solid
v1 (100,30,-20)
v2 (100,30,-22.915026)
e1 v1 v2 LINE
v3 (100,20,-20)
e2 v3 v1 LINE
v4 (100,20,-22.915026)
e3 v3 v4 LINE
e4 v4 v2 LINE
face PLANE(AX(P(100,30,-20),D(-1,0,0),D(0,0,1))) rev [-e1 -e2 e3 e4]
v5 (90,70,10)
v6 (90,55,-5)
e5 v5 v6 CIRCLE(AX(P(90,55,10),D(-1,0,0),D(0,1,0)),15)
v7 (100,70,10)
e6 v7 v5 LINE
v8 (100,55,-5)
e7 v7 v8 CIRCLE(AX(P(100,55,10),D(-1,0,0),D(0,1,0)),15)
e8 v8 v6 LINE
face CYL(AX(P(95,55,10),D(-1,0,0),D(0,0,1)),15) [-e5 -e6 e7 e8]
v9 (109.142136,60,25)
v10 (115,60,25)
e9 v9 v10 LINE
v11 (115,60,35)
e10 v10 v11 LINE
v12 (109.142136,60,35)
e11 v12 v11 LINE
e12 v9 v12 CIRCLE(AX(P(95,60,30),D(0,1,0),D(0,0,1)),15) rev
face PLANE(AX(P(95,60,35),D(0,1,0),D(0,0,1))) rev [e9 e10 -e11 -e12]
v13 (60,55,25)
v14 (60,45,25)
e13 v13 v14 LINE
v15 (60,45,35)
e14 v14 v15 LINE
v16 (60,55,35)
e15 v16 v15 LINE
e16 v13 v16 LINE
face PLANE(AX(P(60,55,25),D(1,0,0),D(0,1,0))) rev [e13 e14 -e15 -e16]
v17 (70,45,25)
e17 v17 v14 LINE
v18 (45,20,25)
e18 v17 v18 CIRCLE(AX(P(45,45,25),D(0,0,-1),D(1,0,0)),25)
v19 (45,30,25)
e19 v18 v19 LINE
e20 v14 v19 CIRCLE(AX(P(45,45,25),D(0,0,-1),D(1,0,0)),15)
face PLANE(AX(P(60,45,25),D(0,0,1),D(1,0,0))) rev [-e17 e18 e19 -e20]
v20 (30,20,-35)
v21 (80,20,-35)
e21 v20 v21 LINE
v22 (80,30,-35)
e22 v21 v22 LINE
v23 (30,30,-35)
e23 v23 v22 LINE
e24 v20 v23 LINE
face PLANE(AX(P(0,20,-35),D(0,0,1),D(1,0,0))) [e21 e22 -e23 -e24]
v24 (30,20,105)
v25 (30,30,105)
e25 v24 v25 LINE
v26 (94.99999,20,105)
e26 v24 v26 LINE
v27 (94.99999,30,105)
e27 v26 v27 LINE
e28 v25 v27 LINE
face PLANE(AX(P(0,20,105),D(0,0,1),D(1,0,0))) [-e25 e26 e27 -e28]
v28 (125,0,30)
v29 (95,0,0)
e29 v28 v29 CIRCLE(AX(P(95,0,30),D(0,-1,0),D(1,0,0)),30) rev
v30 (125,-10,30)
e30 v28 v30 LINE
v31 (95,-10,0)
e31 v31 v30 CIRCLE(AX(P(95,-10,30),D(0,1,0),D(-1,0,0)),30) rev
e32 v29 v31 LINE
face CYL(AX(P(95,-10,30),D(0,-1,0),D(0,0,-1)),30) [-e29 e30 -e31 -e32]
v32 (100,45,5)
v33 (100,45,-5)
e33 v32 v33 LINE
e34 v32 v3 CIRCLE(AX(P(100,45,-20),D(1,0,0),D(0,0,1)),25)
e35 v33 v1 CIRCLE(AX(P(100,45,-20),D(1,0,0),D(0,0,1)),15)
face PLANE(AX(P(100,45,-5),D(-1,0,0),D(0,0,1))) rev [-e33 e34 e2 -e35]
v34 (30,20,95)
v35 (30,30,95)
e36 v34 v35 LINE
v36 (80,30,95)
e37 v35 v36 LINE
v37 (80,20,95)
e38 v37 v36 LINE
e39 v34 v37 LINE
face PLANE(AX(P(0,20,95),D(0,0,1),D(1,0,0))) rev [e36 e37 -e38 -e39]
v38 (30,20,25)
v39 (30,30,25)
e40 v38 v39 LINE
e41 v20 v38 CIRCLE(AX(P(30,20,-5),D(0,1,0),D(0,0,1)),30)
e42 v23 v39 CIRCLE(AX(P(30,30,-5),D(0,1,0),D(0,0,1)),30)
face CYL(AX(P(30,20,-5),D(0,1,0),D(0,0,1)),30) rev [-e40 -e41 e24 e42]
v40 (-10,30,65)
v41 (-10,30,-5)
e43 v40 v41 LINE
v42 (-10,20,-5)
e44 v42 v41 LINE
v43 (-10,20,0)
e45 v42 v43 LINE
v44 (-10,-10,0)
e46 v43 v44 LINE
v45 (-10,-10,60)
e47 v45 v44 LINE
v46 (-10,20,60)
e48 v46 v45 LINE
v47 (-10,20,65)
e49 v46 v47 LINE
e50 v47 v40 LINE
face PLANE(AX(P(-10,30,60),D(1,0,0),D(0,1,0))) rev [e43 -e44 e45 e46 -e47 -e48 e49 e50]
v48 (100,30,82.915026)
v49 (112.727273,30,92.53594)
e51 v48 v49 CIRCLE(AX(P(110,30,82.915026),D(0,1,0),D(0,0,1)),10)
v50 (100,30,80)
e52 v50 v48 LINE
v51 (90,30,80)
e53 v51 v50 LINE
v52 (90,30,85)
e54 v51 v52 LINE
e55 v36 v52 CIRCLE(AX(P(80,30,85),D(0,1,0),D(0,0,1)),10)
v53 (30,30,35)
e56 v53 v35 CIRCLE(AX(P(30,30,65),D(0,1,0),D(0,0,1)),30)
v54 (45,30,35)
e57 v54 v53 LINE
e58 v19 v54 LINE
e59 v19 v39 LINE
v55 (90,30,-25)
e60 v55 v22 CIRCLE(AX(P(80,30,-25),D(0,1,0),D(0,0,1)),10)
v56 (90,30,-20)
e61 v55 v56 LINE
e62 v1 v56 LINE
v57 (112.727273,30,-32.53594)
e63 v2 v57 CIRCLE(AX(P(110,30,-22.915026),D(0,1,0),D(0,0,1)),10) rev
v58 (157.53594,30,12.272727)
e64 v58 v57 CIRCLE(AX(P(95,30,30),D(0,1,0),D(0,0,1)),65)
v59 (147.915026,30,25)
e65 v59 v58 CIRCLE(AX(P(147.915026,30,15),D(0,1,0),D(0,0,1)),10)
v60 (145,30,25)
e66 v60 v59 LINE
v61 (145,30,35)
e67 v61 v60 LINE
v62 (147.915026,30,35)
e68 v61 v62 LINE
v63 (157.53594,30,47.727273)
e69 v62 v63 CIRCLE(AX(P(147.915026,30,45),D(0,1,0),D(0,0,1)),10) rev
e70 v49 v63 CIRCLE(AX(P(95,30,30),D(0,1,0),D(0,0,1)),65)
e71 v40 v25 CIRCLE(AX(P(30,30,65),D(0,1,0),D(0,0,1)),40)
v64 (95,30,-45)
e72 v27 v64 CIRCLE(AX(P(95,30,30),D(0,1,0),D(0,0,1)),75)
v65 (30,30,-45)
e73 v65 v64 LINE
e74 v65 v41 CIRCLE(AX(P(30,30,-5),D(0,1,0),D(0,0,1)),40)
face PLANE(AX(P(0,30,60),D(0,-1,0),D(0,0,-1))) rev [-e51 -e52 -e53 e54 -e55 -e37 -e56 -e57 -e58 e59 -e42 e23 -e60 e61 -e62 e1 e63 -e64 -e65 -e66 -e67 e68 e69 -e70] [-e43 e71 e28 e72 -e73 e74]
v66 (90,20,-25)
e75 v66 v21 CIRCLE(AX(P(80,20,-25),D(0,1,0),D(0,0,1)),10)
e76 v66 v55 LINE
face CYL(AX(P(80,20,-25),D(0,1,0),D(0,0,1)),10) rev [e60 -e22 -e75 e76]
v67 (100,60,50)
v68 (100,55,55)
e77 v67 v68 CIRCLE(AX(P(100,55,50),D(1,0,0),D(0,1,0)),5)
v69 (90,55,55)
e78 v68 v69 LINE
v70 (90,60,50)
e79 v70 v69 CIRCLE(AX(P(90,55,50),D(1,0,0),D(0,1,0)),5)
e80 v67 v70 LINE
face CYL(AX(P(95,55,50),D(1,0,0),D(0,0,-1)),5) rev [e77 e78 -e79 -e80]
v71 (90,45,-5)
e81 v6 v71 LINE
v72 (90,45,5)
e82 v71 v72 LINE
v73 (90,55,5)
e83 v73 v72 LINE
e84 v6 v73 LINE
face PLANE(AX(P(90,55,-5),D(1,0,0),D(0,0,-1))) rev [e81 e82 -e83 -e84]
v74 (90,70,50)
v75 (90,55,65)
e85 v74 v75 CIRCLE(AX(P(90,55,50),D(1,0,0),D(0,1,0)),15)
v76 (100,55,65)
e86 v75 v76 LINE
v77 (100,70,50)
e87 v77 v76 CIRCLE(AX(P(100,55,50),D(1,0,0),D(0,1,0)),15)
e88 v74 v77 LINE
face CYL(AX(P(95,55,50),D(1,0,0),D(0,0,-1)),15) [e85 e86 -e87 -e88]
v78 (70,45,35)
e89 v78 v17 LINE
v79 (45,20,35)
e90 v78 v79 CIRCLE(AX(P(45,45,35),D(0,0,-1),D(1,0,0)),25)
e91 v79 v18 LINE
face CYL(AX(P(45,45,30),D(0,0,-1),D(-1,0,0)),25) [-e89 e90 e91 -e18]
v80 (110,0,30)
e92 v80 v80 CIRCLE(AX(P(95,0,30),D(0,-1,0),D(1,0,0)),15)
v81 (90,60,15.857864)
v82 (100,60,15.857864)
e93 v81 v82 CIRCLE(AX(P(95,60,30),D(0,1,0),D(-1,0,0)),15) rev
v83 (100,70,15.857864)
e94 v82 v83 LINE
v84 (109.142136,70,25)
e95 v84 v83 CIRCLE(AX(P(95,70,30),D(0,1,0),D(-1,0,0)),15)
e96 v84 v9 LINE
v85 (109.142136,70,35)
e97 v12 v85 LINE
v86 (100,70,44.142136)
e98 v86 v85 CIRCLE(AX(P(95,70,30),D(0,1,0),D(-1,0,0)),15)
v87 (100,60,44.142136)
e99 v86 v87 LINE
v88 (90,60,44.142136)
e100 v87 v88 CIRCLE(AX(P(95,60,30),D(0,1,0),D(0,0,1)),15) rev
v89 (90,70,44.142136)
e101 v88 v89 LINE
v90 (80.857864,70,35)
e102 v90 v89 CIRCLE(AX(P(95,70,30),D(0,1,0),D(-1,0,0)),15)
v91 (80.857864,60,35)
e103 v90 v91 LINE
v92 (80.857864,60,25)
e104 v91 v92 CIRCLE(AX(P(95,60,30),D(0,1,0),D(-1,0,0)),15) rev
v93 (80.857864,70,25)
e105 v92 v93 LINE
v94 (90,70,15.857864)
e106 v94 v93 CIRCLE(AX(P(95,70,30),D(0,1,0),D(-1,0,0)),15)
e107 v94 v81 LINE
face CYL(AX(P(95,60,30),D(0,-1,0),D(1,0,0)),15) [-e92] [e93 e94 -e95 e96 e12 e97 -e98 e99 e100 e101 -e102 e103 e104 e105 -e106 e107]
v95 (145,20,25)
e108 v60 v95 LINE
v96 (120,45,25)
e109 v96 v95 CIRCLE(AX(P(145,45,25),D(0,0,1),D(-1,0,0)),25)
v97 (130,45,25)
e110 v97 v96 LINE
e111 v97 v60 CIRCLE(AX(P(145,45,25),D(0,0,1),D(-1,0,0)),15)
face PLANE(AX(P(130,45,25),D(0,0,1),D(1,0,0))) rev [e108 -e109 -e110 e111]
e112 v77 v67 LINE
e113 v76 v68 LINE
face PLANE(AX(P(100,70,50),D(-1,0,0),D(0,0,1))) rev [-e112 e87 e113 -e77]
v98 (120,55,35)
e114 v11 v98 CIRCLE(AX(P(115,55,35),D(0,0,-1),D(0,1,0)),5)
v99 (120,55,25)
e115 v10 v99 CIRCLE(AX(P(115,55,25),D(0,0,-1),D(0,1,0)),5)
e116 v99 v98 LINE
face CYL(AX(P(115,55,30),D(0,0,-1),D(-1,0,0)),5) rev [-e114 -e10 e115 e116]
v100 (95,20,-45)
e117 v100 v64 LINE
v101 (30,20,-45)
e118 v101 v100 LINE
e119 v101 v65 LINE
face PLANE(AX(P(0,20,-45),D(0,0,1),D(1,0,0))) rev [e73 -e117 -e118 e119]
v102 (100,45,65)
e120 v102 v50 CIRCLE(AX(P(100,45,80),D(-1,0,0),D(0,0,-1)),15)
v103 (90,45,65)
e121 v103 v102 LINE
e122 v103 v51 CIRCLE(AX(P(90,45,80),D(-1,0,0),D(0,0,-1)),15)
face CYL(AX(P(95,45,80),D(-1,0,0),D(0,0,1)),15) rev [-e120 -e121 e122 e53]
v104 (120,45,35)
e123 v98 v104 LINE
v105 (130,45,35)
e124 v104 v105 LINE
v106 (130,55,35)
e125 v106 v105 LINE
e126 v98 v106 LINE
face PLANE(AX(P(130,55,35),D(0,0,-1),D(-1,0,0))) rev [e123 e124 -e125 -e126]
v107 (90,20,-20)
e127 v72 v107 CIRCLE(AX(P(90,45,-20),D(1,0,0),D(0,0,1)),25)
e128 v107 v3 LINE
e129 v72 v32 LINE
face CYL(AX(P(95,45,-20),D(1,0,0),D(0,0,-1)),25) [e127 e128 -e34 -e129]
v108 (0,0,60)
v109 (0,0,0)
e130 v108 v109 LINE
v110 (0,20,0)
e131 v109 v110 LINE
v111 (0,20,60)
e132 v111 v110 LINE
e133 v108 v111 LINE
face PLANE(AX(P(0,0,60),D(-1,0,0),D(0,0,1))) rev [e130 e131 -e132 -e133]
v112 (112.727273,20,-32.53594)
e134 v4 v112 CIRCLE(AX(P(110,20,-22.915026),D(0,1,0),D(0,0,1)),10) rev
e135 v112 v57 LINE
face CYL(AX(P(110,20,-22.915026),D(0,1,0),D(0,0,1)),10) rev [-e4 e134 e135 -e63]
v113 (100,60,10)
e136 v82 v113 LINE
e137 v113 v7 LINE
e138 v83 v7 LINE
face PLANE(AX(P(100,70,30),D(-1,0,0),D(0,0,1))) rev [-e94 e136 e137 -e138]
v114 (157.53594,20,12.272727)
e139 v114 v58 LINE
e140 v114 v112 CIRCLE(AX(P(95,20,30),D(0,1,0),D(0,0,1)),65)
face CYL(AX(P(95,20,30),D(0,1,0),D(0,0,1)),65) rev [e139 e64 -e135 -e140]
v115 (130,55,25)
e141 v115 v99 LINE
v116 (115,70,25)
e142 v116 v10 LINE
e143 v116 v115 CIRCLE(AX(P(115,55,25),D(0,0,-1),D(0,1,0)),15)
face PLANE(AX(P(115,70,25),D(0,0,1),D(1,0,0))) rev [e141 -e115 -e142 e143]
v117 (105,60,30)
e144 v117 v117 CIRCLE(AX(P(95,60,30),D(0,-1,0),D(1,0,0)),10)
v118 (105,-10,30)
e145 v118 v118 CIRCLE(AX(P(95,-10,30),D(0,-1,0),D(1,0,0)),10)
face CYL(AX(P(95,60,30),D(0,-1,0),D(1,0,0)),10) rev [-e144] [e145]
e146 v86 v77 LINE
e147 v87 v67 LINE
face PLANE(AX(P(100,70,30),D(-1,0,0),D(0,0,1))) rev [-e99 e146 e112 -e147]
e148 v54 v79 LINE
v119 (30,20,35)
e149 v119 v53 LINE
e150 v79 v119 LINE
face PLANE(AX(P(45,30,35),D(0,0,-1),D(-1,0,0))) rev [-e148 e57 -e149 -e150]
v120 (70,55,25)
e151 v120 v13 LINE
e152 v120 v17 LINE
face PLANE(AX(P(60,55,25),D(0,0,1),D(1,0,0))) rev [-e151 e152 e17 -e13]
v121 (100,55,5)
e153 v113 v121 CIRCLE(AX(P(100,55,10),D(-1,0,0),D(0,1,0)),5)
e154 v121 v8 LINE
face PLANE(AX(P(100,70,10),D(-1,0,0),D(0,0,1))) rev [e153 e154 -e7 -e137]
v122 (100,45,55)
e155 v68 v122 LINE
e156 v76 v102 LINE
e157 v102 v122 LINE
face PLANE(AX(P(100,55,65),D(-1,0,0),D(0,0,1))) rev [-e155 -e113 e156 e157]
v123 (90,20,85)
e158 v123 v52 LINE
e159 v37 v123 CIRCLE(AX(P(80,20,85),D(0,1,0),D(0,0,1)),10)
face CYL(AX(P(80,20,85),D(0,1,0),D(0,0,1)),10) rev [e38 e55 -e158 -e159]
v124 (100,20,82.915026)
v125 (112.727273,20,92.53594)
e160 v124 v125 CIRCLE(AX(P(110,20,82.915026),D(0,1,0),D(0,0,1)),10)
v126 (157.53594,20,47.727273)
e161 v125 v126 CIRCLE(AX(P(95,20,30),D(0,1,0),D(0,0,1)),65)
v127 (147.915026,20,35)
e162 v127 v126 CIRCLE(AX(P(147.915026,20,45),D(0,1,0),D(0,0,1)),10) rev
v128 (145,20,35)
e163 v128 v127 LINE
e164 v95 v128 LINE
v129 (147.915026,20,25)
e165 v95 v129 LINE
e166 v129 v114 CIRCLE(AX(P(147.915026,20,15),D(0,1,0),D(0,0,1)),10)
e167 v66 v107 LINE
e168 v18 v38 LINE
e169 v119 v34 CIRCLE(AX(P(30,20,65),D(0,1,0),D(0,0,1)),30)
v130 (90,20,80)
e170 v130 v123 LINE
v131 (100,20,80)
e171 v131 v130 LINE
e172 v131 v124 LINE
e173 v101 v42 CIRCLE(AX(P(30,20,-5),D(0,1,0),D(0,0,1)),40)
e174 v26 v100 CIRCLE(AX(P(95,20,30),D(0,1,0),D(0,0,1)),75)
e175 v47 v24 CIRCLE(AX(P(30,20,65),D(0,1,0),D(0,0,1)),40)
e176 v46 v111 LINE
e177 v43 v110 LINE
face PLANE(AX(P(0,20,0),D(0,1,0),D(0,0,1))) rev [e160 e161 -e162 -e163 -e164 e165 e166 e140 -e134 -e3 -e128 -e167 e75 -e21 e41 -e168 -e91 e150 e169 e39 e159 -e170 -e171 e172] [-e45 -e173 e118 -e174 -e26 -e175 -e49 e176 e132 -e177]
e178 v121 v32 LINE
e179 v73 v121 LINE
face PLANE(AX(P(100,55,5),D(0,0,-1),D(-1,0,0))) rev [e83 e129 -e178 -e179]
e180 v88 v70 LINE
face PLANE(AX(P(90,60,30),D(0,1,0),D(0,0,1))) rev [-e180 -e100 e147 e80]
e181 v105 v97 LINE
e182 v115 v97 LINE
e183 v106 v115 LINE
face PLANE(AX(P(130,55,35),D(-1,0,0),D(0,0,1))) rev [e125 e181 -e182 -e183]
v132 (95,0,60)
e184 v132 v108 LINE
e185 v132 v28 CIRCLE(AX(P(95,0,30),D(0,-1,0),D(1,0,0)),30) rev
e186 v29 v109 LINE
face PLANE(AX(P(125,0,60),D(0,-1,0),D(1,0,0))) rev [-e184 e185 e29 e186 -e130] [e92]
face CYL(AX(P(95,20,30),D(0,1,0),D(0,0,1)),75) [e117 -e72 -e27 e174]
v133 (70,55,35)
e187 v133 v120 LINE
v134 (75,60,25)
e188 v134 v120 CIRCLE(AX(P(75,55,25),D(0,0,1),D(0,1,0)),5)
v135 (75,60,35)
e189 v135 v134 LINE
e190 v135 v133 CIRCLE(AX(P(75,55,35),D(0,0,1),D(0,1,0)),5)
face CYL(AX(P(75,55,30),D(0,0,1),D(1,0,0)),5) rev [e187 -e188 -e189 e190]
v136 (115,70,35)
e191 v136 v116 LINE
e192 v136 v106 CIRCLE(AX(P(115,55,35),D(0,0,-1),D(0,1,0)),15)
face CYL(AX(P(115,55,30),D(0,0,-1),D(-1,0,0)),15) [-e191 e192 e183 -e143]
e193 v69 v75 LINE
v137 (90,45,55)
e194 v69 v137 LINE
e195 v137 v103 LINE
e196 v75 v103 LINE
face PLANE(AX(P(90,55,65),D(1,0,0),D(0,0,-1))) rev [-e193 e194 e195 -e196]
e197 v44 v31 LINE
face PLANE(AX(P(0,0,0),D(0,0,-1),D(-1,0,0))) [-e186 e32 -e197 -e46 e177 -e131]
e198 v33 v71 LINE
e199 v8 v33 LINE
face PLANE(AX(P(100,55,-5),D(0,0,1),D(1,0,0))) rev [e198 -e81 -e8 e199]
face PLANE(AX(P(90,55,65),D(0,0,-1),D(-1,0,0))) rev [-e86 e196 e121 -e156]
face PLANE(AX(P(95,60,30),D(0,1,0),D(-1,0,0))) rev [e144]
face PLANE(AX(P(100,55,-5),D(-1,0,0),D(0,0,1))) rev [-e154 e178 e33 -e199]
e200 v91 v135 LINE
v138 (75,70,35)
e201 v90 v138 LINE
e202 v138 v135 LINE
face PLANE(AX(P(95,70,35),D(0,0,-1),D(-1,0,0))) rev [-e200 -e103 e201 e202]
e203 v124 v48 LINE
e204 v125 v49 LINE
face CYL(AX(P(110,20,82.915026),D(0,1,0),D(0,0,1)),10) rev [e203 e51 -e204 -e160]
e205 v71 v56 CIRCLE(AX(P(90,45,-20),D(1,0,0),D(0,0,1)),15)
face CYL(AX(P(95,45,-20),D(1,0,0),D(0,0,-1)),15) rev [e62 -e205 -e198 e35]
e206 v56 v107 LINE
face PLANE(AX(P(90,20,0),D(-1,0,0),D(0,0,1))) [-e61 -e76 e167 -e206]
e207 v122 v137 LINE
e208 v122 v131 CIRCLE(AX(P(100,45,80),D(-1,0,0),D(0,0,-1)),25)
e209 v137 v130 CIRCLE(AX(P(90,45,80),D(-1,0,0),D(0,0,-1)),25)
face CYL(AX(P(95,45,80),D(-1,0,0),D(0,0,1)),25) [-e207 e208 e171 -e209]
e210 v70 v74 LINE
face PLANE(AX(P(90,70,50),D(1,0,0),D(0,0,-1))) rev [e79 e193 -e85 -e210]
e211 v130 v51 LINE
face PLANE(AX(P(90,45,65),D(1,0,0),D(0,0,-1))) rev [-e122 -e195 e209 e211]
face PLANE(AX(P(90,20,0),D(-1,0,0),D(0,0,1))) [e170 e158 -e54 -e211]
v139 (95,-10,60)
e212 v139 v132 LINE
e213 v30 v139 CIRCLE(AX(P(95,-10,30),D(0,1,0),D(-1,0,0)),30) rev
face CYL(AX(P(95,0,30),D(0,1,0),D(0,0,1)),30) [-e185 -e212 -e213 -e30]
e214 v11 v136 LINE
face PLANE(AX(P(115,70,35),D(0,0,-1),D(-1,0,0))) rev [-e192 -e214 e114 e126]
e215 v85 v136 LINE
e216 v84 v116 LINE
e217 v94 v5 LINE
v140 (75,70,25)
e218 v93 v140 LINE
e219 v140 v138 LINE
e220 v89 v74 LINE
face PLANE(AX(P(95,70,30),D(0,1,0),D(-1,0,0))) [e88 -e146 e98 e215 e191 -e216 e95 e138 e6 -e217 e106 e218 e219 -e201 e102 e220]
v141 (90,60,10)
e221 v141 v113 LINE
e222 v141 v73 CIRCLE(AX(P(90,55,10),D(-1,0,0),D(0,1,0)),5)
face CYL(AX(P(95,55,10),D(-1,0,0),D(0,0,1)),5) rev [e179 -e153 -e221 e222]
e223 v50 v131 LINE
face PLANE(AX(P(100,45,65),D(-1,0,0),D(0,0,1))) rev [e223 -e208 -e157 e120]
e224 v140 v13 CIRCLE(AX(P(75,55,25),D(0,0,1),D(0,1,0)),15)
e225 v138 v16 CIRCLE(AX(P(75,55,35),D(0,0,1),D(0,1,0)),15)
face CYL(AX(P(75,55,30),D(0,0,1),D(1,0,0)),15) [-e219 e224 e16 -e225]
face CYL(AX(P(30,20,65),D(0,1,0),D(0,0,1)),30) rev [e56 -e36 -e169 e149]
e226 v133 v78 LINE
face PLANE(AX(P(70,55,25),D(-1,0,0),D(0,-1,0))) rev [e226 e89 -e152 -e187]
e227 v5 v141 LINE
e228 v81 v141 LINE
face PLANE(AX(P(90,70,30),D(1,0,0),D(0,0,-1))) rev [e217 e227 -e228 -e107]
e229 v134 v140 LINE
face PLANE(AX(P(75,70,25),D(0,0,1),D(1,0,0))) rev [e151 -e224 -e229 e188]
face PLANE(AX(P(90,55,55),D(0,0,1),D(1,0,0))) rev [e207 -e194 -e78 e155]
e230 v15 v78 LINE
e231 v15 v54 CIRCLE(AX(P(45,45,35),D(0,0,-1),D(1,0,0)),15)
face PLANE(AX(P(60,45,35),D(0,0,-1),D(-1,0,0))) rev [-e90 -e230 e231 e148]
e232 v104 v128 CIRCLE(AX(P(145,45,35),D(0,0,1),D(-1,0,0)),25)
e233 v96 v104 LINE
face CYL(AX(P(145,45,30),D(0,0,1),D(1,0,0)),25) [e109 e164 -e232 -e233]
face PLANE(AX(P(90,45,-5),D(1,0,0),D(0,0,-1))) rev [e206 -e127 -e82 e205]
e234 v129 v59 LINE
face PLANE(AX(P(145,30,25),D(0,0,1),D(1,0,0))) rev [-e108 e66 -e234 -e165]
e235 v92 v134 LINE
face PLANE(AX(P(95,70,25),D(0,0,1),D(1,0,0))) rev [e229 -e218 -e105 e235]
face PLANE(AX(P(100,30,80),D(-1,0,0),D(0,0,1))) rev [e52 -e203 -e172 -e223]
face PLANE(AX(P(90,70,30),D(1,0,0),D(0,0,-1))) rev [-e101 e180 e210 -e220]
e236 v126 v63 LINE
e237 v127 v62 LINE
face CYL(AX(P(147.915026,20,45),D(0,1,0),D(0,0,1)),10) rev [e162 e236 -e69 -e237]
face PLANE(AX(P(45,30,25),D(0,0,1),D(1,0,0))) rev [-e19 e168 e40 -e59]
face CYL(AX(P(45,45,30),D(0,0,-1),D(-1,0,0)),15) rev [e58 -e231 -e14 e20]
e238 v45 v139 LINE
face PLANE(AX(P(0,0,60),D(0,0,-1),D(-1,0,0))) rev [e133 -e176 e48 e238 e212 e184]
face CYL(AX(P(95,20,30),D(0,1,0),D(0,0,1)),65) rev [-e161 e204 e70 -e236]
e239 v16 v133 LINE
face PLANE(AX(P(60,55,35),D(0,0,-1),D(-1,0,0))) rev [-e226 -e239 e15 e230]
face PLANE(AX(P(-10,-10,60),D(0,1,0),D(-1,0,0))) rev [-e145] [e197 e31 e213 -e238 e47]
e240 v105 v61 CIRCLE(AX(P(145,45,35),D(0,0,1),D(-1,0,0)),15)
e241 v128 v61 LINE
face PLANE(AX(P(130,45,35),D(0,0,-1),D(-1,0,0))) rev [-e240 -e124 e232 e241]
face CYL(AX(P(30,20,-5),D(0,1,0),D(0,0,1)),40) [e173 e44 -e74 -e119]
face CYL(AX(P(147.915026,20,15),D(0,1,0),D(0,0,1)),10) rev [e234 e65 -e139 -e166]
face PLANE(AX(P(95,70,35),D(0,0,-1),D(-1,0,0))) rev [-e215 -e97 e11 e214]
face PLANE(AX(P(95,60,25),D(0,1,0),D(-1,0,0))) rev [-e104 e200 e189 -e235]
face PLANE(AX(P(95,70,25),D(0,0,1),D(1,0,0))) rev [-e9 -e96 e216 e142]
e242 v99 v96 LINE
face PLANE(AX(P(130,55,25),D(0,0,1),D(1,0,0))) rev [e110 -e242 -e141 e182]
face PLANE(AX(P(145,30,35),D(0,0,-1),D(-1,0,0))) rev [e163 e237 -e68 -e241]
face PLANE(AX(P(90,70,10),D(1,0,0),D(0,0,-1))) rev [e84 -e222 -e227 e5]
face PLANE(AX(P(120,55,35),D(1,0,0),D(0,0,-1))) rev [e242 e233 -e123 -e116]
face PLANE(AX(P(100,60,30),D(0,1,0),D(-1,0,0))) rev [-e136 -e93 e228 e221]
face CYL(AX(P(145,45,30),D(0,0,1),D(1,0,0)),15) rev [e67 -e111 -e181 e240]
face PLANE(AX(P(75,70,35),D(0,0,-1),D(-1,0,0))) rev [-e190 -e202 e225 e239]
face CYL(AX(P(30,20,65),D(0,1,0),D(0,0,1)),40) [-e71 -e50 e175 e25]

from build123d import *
from build123d.topology import SkipClean

# Parameters (mm, degrees)
Y_KSEKLIK_EKSTR_ZYON1_DEPTH = 60
RADYUS1_R                   = 30
IZIM4_R                     = 15
IZIM4_R_2                   = 10
Y_KSEKLIK_EKSTR_ZYON2_DEPTH = 70
IZIM5_R                     = 15
Y_KSEKLIK_EKSTR_ZYON3_DEPTH = 10
Y_KSEKLIK_EKSTR_ZYON4_START = -10
Y_KSEKLIK_EKSTR_ZYON4_DEPTH = 10
KES_EKSTR_ZYON1_START       = -10
KES_EKSTR_ZYON1_DEPTH       = 10
IZIM11_W                    = 10
IZIM11_H                    = 10
DAIRESEL_KAPLAMA3_COUNT     = 4
IZIM13_W                    = 10
IZIM13_H                    = 10
Y_KSEKLIK_EKSTR_ZYON5_DEPTH = 12.084973779
IZIM14_R                    = 10
KES_EKSTR_ZYON2_DEPTH       = 10


with BuildPart() as part:
    # Çizim2 → Yükseklik-Ekstrüzyon1 (new body)
    with BuildSketch(Plane.XY):
        Polygon((0, 0), (0, 30), (-10, 30), (-10, -10), (125, -10), (125, 0), align=None)
    extrude(amount=Y_KSEKLIK_EKSTR_ZYON1_DEPTH)

    # Radyus1
    radyus1_edges = [part.edges().sort_by_distance(p)[0] for p in [
        (125, -5, 0),
        (125, -5, 60),
    ]]
    fillet(radyus1_edges, radius=RADYUS1_R - 0.0001)  # a hair under: the kernel refuses the full size

    # Çizim4 → Yükseklik-Ekstrüzyon2 (add)
    with BuildSketch(Plane.XZ.offset(10)):
        with Locations((95, 30)):
            Circle(IZIM4_R)
        with Locations((95, 30)):
            Circle(IZIM4_R_2, mode=Mode.SUBTRACT)
    extrude(amount=-Y_KSEKLIK_EKSTR_ZYON2_DEPTH)

    # Çizim5 → Yükseklik-Ekstrüzyon3 (add)
    with BuildSketch(Plane(origin=(0, 60, 0), x_dir=(1, 0, 0), z_dir=(0, 1, 0))):
        with Locations((95, -30)):
            Circle(IZIM5_R)
    extrude(amount=Y_KSEKLIK_EKSTR_ZYON3_DEPTH)

    # Çizim7 → Yükseklik-Ekstrüzyon4 (add)
    with BuildSketch(Plane(origin=(0, 30, 0), x_dir=(1, 0, 0), z_dir=(0, 1, 0)).offset(Y_KSEKLIK_EKSTR_ZYON4_START)):
        with BuildLine():
            Line((95, 45), (30, 45))
            ThreePointArc((30, 45), (1.715728753, 33.284271247), (-10, 5))
            Line((-10, 5), (-10, -65))
            ThreePointArc((-10, -65), (1.715728753, -93.284271247), (30, -105))
            Line((30, -105), (94.99998957, -105))
            ThreePointArc((94.99998957, -105), (170, -30.000005215), (95, 45))
        make_face()
        with BuildLine():
            Line((80, -95), (30, -95))
            ThreePointArc((30, -95), (8.786796564, -86.213203436), (0, -65))
            ThreePointArc((0, -65), (8.786796564, -43.786796564), (30, -35))
            Line((30, -35), (80.857864376, -35))
            ThreePointArc((80.857864376, -35), (80, -30), (80.857864376, -25))
            Line((80.857864376, -25), (30, -25))
            ThreePointArc((30, -25), (0, 5), (30, 35))
            Line((30, 35), (80, 35))
            ThreePointArc((80, 35), (87.071067812, 32.071067812), (90, 25))
            Line((90, 25), (90, -15.857864376))
            ThreePointArc((90, -15.857864376), (95, -15), (100, -15.857864376))
            Line((100, -15.857864376), (100, 22.915026221))
            ThreePointArc((100, 22.915026221), (103.969773108, 30.892266573), (112.727272727, 32.53594008))
            ThreePointArc((112.727272727, 32.53594008), (140.961940777, 15.961940777), (157.53594008, -12.272727273))
            ThreePointArc((157.53594008, -12.272727273), (155.892266573, -21.030226892), (147.915026221, -25))
            Line((147.915026221, -25), (109.142135624, -25))
            ThreePointArc((109.142135624, -25), (110, -30), (109.142135624, -35))
            Line((109.142135624, -35), (147.915026221, -35))
            ThreePointArc((147.915026221, -35), (155.892266573, -38.969773108), (157.53594008, -47.727272727))
            ThreePointArc((157.53594008, -47.727272727), (140.961940777, -75.961940777), (112.727272727, -92.53594008))
            ThreePointArc((112.727272727, -92.53594008), (103.969773108, -90.892266573), (100, -82.915026221))
            Line((100, -82.915026221), (100, -44.142135624))
            ThreePointArc((100, -44.142135624), (95, -45), (90, -44.142135624))
            Line((90, -44.142135624), (90, -85))
            ThreePointArc((90, -85), (87.071067812, -92.071067812), (80, -95))
        make_face(mode=Mode.SUBTRACT)
    extrude(amount=Y_KSEKLIK_EKSTR_ZYON4_DEPTH)

    # Çizim8 → Kes-Ekstrüzyon1 (cut)
    with SkipClean():  # the faces are left unmerged after this step: merging them gives an invalid solid
        with BuildSketch(Plane(origin=(0, 30, 0), x_dir=(1, 0, 0), z_dir=(0, 1, 0)).offset(KES_EKSTR_ZYON1_START)):
            with BuildLine():
                Line((30, -25), (80.857864376, -25))
                ThreePointArc((80.857864376, -25), (80, -30), (80.857864376, -35))
                Line((80.857864376, -35), (30, -35))
                Line((30, -35), (30, -25))
            make_face()
            with BuildLine():
                Line((147.915026221, -25), (147.915026221, -35))
                Line((147.915026221, -35), (109.142135624, -35))
                ThreePointArc((109.142135624, -35), (110, -30), (109.142135624, -25))
                Line((109.142135624, -25), (147.915026221, -25))
            make_face()
            with BuildLine():
                Line((100, 22.915026221), (90, 22.915026221))
                Line((90, 22.915026221), (90, -15.857864376))
                ThreePointArc((90, -15.857864376), (95, -15), (100, -15.857864376))
                Line((100, -15.857864376), (100, 22.915026221))
            make_face()
            with BuildLine():
                Line((100, -82.915026221), (90, -82.915026221))
                Line((90, -82.915026221), (90, -44.142135624))
                ThreePointArc((90, -44.142135624), (95, -45), (100, -44.142135624))
                Line((100, -44.142135624), (100, -82.915026221))
            make_face()
        extrude(amount=KES_EKSTR_ZYON1_DEPTH, mode=Mode.SUBTRACT)
    add(part.part.scale(1), mode=Mode.REPLACE)  # the faces are merged on a copy

    # Süpür1: sweep along a path in Çizim10
    with BuildLine(Plane.XY.offset(30)) as s_p_r1_path:
        Line((95, 70), (115, 70))
        ThreePointArc((115, 70), (125.606601718, 65.606601718), (130, 55))
        Line((130, 55), (130, 45))
        ThreePointArc((130, 45), (134.393398282, 34.393398282), (145, 30))
        Line((145, 30), (147.915026221, 30))
    # Çizim11 → Süpür1 (sweep)
    with BuildSketch(Plane.ZY.offset(-147.915026221)):
        with Locations((30, 25)):
            Rectangle(IZIM11_W, IZIM11_H)
    s_p_r1 = sweep(path=s_p_r1_path.line)

    # Dairesel Kaplama3: Süpür1 ×4 about axis
    dairesel_kaplama3_axis = Axis((95, 0, 30), (0, 1, 0))
    for i in range(1, DAIRESEL_KAPLAMA3_COUNT):
        add(s_p_r1.rotate(dairesel_kaplama3_axis, i * 360 / DAIRESEL_KAPLAMA3_COUNT))

    # Çizim13 → Yükseklik-Ekstrüzyon5 (add)
    with BuildSketch(Plane(origin=(30, 0, 0), x_dir=(0, 0, -1), z_dir=(1, 0, 0))):
        with Locations((-30, 25)):
            Rectangle(IZIM13_W, IZIM13_H)
    extrude(amount=Y_KSEKLIK_EKSTR_ZYON5_DEPTH)

    # Çizim14 → Kes-Ekstrüzyon2 (cut)
    with BuildSketch(Plane.XZ.offset(10)):
        with Locations((95, 30)):
            Circle(IZIM14_R)
    extrude(amount=-KES_EKSTR_ZYON2_DEPTH, mode=Mode.SUBTRACT)


solid = part.part
